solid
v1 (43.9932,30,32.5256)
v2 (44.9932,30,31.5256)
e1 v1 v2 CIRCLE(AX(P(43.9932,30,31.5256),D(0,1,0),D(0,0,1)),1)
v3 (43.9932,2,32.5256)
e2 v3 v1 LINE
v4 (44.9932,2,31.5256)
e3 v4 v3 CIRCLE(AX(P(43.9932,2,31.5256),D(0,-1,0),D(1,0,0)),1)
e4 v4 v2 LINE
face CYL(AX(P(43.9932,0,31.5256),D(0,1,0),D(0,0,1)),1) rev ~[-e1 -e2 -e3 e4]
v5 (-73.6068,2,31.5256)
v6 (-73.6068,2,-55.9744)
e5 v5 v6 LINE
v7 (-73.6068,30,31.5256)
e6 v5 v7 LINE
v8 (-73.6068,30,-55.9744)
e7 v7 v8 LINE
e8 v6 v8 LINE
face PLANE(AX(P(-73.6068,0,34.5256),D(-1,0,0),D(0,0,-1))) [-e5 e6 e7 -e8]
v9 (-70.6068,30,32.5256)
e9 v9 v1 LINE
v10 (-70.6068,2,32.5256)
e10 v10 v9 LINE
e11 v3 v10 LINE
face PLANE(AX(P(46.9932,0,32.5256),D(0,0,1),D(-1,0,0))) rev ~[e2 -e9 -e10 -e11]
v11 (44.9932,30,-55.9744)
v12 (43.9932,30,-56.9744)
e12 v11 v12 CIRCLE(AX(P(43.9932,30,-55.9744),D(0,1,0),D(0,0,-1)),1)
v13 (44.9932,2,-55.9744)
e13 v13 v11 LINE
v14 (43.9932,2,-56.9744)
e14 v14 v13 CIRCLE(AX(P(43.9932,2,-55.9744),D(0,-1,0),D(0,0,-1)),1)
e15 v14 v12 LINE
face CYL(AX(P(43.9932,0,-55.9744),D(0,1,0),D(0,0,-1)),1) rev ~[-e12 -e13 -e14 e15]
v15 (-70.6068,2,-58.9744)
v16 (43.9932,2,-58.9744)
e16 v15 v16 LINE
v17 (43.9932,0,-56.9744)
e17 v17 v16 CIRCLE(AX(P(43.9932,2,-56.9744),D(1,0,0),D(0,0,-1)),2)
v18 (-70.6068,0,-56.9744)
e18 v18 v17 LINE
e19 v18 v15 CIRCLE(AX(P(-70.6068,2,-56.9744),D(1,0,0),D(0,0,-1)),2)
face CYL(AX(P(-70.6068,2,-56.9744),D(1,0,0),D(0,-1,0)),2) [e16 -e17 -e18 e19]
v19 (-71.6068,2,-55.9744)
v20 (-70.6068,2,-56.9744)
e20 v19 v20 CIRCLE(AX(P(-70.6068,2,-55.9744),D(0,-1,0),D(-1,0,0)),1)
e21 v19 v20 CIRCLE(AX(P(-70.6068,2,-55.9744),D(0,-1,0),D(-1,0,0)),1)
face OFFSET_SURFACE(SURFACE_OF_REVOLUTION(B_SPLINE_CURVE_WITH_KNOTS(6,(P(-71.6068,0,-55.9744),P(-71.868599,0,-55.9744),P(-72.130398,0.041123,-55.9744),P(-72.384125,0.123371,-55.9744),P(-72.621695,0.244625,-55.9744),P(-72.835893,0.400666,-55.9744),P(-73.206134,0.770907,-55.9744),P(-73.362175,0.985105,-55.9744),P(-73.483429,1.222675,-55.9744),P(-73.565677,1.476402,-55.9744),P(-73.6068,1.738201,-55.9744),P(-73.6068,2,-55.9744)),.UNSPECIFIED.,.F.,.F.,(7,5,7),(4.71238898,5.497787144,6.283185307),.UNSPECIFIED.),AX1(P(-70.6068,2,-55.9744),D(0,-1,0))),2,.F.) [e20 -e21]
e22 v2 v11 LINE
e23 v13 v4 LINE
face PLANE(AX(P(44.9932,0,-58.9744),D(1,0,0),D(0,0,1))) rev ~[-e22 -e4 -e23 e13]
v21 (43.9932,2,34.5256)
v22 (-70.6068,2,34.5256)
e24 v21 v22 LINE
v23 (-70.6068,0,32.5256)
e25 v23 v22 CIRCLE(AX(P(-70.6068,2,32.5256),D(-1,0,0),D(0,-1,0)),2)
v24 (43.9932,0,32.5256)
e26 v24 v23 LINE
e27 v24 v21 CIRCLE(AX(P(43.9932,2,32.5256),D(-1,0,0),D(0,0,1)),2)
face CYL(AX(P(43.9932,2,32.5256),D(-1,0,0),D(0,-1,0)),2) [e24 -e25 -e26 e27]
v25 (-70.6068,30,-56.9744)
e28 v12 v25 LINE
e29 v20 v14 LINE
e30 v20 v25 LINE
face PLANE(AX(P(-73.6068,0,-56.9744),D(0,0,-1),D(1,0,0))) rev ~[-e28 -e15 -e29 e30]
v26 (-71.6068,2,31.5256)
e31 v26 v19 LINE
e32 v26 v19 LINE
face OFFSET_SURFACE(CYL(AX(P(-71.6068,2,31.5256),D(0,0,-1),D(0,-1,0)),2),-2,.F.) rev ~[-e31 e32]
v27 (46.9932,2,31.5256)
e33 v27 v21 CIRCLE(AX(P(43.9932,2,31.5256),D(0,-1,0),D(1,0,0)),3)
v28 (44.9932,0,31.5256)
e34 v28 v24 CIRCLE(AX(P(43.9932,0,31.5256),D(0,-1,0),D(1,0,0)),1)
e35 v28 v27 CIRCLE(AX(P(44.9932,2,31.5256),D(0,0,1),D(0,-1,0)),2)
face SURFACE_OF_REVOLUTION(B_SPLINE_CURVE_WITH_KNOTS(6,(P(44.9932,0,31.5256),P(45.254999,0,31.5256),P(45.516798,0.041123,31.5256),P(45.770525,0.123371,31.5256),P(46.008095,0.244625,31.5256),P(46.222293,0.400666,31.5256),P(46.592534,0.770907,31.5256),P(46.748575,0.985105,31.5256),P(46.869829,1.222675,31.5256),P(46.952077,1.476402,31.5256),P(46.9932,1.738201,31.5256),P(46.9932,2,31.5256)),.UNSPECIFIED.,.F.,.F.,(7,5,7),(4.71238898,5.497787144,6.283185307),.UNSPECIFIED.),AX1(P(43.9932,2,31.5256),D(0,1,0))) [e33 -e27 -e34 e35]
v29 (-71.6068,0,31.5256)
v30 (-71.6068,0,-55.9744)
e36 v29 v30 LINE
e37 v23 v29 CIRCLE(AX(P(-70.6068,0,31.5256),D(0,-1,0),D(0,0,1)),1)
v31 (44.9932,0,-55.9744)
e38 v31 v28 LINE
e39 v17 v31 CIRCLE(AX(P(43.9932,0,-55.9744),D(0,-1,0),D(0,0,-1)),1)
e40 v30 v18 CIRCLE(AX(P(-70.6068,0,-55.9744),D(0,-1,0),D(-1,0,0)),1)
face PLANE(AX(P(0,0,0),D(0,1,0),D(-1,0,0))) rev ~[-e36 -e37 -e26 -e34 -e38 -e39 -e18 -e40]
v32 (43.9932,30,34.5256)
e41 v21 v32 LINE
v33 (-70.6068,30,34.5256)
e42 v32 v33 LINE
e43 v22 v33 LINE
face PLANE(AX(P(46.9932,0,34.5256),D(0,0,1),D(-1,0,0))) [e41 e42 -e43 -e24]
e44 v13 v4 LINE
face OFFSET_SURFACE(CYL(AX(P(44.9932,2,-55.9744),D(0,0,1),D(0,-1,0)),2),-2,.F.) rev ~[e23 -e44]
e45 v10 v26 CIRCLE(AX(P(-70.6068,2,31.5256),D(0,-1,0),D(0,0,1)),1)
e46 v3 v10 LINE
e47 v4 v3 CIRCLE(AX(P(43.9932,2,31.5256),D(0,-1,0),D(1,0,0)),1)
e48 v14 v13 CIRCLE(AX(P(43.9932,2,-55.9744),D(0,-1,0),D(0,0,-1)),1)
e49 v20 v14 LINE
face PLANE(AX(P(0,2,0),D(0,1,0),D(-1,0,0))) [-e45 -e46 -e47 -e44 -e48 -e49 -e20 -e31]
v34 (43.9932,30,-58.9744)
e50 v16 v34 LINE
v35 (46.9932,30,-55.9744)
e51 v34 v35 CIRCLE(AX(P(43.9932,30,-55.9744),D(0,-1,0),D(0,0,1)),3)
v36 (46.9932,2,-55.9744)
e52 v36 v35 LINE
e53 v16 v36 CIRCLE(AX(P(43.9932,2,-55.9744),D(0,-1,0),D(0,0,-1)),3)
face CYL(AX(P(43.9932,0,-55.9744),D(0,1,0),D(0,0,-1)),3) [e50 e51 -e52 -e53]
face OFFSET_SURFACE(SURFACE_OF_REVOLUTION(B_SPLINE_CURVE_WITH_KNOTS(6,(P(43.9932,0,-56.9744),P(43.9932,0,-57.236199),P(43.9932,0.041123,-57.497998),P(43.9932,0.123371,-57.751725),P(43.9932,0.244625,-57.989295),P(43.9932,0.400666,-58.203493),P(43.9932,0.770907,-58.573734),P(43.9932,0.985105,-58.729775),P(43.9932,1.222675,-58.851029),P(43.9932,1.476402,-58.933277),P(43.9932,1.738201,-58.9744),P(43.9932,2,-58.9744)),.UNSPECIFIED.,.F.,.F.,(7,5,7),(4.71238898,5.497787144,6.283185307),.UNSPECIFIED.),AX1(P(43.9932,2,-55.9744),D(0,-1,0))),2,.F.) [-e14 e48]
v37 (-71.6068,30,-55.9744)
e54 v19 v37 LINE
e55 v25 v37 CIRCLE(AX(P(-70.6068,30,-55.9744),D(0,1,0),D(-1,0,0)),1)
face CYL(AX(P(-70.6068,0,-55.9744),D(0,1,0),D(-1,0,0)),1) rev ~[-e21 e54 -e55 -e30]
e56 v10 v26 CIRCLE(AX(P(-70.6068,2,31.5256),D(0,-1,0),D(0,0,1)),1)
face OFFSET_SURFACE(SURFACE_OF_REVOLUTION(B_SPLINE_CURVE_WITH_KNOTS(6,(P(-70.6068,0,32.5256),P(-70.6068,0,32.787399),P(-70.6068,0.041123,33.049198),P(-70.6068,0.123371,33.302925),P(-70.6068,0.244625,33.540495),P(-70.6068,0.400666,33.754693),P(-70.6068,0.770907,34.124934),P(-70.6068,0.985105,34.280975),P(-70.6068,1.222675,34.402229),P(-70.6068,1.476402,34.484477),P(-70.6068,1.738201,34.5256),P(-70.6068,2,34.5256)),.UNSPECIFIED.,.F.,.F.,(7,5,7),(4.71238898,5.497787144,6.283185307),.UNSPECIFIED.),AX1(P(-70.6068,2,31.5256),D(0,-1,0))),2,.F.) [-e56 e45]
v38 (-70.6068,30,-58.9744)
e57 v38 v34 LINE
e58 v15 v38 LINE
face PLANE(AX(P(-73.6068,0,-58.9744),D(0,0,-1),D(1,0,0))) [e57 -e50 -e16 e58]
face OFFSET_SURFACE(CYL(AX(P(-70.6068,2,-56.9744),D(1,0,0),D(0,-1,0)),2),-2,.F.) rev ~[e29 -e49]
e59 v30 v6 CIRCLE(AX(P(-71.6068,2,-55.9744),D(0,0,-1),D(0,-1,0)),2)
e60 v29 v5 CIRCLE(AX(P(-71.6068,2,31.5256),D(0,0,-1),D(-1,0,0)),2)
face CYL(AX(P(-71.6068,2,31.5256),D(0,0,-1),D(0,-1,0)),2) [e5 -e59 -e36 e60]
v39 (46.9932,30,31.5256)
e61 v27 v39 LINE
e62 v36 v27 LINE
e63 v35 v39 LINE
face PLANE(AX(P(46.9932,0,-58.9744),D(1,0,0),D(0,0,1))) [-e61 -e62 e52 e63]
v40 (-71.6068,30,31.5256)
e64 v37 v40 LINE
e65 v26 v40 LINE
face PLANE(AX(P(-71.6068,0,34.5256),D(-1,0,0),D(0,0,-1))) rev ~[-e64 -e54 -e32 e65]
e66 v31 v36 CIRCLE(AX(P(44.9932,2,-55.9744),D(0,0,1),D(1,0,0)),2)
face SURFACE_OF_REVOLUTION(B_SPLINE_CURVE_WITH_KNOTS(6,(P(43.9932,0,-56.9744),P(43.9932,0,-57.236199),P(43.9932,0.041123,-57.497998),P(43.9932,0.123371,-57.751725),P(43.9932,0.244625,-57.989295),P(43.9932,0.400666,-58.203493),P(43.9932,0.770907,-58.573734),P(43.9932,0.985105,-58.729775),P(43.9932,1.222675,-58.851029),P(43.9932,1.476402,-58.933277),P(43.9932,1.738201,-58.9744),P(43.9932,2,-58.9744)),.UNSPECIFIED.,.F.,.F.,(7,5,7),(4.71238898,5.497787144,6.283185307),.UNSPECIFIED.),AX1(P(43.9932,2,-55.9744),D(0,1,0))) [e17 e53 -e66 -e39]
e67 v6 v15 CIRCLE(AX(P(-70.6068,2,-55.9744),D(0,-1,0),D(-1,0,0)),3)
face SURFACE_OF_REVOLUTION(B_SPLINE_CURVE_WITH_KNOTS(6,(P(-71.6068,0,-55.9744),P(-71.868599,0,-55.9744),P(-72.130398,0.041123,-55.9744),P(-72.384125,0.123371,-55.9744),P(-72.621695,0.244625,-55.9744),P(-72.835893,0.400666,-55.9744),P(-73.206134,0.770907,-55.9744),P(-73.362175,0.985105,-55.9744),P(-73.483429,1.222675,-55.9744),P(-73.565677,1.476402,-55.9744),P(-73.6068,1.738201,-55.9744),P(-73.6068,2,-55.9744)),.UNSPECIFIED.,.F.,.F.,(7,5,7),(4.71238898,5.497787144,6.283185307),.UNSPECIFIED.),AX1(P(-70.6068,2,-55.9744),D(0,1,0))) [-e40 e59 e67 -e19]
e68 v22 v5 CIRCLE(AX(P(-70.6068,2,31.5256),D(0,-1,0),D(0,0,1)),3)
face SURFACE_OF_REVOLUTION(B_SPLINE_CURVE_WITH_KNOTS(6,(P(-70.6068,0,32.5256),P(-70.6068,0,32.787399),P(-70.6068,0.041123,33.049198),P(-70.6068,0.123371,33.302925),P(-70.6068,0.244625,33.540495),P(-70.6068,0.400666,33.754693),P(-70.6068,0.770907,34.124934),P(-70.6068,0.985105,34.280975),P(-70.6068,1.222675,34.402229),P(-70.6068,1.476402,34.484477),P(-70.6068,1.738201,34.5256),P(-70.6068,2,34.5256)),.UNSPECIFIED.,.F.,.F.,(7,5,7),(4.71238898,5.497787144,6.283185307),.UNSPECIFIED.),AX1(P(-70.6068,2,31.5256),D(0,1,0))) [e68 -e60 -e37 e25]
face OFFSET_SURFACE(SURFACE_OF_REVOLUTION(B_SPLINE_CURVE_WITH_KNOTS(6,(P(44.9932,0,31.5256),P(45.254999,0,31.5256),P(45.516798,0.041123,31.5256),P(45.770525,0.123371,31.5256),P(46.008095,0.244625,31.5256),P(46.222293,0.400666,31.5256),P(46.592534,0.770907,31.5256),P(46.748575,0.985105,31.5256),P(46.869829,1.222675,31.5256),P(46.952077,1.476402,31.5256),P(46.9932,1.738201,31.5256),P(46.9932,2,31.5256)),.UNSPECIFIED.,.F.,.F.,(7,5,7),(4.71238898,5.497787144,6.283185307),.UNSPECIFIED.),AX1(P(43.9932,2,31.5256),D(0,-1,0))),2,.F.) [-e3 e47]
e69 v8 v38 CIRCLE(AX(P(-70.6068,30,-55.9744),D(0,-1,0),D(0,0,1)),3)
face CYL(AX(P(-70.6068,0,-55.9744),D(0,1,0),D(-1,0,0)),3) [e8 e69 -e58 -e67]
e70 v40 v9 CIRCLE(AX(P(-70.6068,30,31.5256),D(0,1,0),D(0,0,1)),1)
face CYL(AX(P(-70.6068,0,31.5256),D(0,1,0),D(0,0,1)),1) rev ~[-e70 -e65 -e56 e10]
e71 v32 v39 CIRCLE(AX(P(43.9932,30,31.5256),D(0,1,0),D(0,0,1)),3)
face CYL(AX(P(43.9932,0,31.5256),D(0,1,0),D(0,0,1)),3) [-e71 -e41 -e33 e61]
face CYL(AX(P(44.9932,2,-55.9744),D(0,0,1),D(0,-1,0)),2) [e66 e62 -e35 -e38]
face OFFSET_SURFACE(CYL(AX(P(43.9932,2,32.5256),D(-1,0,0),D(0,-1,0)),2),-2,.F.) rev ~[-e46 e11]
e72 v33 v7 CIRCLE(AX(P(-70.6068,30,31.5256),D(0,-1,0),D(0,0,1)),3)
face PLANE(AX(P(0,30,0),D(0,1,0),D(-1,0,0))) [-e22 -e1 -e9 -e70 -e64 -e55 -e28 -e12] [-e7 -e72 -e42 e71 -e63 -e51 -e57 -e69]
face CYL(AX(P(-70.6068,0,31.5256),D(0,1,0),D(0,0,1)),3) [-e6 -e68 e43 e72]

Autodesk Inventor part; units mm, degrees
ref_plane "YZ Plane" through (0, 0, 0) normal (1, 0, 0) x (0, 1, 0)
ref_plane "XZ Plane" through (0, 0, 0) normal (0, 1, 0) x (-1, 0, 0)
ref_plane "XY Plane" through (0, 0, 0) normal (0, 0, 1) x (1, 0, 0)
sketch "Esquisse1" plane through (0, 0, 0) normal (0, 1, 0) x (-1, 0, 0)
  line L0 (-46.9932, 34.5256) -> (73.6068, 34.5256)
  line L1 (73.6068, 34.5256) -> (73.6068, -58.9744)
  line L2 (73.6068, -58.9744) -> (-46.9932, -58.9744)
  line L3 (-46.9932, -58.9744) -> (-46.9932, 34.5256)
  point P0 (0, 0)
  dimension "d0" = 120.6
  dimension "d2" = 93.5
extrude "Extrusion1" add sketch "Esquisse1" along normal blind 30
fillet "Congé1" radius 3 4 edges at (-73.6068, 15, -58.9744) (46.9932, 15, -58.9744) (-73.6068, 15, 34.5256) (46.9932, 15, 34.5256)
fillet "Congé2" radius 2 8 edges at (46.1146, 0, -58.0957) (46.9932, 0, -12.2244) (46.1146, 0, 33.647) (-13.3068, 0, 34.5256) (-72.7281, 0, 33.647) (-73.6068, 0, -12.2244) (-72.7281, 0, -58.0957) (-13.3068, 0, -58.9744)
shell "Coque1" thickness 2 removed faces 1 at (5.7932, 30, 3.359)
sketch "Esquisse2" plane through (-70.6068, 2, 32.5256) normal (0, 1, 0) x (1, 0, 0)
  line L0 (114.6, 0) -> (0, 0) projected
  arc A0 (114.6, 0) -> (115.6, 1) centre (114.6, 1) ccw projected
  line L1 (115.6, 88.5) -> (115.6, 1) projected
  arc A1 (115.6, 88.5) -> (114.6, 89.5) centre (114.6, 88.5) ccw projected
  line L2 (114.6, 89.5) -> (0, 89.5) projected
  arc A2 (0, 89.5) -> (-1, 88.5) centre (0, 88.5) ccw projected
  line L3 (-1, 1) -> (-1, 88.5) projected
  arc A3 (-1, 1) -> (0, 0) centre (0, 1) ccw projected
  circle A4 centre (7.1405, 82.078) radius 4
  circle A5 centre (108.4816, 82.078) radius 4
  circle A6 centre (108.4816, 4.0474) radius 4
  circle A7 centre (5.9552, 7.9983) radius 4
  point P0 (70.6068, 32.5256)
  dimension "d8" = 8
  dimension "d10" = 8
  dimension "d11" = 8
  dimension "d12" = 8
properties part number "Boitier" material "Plastique ABS"
